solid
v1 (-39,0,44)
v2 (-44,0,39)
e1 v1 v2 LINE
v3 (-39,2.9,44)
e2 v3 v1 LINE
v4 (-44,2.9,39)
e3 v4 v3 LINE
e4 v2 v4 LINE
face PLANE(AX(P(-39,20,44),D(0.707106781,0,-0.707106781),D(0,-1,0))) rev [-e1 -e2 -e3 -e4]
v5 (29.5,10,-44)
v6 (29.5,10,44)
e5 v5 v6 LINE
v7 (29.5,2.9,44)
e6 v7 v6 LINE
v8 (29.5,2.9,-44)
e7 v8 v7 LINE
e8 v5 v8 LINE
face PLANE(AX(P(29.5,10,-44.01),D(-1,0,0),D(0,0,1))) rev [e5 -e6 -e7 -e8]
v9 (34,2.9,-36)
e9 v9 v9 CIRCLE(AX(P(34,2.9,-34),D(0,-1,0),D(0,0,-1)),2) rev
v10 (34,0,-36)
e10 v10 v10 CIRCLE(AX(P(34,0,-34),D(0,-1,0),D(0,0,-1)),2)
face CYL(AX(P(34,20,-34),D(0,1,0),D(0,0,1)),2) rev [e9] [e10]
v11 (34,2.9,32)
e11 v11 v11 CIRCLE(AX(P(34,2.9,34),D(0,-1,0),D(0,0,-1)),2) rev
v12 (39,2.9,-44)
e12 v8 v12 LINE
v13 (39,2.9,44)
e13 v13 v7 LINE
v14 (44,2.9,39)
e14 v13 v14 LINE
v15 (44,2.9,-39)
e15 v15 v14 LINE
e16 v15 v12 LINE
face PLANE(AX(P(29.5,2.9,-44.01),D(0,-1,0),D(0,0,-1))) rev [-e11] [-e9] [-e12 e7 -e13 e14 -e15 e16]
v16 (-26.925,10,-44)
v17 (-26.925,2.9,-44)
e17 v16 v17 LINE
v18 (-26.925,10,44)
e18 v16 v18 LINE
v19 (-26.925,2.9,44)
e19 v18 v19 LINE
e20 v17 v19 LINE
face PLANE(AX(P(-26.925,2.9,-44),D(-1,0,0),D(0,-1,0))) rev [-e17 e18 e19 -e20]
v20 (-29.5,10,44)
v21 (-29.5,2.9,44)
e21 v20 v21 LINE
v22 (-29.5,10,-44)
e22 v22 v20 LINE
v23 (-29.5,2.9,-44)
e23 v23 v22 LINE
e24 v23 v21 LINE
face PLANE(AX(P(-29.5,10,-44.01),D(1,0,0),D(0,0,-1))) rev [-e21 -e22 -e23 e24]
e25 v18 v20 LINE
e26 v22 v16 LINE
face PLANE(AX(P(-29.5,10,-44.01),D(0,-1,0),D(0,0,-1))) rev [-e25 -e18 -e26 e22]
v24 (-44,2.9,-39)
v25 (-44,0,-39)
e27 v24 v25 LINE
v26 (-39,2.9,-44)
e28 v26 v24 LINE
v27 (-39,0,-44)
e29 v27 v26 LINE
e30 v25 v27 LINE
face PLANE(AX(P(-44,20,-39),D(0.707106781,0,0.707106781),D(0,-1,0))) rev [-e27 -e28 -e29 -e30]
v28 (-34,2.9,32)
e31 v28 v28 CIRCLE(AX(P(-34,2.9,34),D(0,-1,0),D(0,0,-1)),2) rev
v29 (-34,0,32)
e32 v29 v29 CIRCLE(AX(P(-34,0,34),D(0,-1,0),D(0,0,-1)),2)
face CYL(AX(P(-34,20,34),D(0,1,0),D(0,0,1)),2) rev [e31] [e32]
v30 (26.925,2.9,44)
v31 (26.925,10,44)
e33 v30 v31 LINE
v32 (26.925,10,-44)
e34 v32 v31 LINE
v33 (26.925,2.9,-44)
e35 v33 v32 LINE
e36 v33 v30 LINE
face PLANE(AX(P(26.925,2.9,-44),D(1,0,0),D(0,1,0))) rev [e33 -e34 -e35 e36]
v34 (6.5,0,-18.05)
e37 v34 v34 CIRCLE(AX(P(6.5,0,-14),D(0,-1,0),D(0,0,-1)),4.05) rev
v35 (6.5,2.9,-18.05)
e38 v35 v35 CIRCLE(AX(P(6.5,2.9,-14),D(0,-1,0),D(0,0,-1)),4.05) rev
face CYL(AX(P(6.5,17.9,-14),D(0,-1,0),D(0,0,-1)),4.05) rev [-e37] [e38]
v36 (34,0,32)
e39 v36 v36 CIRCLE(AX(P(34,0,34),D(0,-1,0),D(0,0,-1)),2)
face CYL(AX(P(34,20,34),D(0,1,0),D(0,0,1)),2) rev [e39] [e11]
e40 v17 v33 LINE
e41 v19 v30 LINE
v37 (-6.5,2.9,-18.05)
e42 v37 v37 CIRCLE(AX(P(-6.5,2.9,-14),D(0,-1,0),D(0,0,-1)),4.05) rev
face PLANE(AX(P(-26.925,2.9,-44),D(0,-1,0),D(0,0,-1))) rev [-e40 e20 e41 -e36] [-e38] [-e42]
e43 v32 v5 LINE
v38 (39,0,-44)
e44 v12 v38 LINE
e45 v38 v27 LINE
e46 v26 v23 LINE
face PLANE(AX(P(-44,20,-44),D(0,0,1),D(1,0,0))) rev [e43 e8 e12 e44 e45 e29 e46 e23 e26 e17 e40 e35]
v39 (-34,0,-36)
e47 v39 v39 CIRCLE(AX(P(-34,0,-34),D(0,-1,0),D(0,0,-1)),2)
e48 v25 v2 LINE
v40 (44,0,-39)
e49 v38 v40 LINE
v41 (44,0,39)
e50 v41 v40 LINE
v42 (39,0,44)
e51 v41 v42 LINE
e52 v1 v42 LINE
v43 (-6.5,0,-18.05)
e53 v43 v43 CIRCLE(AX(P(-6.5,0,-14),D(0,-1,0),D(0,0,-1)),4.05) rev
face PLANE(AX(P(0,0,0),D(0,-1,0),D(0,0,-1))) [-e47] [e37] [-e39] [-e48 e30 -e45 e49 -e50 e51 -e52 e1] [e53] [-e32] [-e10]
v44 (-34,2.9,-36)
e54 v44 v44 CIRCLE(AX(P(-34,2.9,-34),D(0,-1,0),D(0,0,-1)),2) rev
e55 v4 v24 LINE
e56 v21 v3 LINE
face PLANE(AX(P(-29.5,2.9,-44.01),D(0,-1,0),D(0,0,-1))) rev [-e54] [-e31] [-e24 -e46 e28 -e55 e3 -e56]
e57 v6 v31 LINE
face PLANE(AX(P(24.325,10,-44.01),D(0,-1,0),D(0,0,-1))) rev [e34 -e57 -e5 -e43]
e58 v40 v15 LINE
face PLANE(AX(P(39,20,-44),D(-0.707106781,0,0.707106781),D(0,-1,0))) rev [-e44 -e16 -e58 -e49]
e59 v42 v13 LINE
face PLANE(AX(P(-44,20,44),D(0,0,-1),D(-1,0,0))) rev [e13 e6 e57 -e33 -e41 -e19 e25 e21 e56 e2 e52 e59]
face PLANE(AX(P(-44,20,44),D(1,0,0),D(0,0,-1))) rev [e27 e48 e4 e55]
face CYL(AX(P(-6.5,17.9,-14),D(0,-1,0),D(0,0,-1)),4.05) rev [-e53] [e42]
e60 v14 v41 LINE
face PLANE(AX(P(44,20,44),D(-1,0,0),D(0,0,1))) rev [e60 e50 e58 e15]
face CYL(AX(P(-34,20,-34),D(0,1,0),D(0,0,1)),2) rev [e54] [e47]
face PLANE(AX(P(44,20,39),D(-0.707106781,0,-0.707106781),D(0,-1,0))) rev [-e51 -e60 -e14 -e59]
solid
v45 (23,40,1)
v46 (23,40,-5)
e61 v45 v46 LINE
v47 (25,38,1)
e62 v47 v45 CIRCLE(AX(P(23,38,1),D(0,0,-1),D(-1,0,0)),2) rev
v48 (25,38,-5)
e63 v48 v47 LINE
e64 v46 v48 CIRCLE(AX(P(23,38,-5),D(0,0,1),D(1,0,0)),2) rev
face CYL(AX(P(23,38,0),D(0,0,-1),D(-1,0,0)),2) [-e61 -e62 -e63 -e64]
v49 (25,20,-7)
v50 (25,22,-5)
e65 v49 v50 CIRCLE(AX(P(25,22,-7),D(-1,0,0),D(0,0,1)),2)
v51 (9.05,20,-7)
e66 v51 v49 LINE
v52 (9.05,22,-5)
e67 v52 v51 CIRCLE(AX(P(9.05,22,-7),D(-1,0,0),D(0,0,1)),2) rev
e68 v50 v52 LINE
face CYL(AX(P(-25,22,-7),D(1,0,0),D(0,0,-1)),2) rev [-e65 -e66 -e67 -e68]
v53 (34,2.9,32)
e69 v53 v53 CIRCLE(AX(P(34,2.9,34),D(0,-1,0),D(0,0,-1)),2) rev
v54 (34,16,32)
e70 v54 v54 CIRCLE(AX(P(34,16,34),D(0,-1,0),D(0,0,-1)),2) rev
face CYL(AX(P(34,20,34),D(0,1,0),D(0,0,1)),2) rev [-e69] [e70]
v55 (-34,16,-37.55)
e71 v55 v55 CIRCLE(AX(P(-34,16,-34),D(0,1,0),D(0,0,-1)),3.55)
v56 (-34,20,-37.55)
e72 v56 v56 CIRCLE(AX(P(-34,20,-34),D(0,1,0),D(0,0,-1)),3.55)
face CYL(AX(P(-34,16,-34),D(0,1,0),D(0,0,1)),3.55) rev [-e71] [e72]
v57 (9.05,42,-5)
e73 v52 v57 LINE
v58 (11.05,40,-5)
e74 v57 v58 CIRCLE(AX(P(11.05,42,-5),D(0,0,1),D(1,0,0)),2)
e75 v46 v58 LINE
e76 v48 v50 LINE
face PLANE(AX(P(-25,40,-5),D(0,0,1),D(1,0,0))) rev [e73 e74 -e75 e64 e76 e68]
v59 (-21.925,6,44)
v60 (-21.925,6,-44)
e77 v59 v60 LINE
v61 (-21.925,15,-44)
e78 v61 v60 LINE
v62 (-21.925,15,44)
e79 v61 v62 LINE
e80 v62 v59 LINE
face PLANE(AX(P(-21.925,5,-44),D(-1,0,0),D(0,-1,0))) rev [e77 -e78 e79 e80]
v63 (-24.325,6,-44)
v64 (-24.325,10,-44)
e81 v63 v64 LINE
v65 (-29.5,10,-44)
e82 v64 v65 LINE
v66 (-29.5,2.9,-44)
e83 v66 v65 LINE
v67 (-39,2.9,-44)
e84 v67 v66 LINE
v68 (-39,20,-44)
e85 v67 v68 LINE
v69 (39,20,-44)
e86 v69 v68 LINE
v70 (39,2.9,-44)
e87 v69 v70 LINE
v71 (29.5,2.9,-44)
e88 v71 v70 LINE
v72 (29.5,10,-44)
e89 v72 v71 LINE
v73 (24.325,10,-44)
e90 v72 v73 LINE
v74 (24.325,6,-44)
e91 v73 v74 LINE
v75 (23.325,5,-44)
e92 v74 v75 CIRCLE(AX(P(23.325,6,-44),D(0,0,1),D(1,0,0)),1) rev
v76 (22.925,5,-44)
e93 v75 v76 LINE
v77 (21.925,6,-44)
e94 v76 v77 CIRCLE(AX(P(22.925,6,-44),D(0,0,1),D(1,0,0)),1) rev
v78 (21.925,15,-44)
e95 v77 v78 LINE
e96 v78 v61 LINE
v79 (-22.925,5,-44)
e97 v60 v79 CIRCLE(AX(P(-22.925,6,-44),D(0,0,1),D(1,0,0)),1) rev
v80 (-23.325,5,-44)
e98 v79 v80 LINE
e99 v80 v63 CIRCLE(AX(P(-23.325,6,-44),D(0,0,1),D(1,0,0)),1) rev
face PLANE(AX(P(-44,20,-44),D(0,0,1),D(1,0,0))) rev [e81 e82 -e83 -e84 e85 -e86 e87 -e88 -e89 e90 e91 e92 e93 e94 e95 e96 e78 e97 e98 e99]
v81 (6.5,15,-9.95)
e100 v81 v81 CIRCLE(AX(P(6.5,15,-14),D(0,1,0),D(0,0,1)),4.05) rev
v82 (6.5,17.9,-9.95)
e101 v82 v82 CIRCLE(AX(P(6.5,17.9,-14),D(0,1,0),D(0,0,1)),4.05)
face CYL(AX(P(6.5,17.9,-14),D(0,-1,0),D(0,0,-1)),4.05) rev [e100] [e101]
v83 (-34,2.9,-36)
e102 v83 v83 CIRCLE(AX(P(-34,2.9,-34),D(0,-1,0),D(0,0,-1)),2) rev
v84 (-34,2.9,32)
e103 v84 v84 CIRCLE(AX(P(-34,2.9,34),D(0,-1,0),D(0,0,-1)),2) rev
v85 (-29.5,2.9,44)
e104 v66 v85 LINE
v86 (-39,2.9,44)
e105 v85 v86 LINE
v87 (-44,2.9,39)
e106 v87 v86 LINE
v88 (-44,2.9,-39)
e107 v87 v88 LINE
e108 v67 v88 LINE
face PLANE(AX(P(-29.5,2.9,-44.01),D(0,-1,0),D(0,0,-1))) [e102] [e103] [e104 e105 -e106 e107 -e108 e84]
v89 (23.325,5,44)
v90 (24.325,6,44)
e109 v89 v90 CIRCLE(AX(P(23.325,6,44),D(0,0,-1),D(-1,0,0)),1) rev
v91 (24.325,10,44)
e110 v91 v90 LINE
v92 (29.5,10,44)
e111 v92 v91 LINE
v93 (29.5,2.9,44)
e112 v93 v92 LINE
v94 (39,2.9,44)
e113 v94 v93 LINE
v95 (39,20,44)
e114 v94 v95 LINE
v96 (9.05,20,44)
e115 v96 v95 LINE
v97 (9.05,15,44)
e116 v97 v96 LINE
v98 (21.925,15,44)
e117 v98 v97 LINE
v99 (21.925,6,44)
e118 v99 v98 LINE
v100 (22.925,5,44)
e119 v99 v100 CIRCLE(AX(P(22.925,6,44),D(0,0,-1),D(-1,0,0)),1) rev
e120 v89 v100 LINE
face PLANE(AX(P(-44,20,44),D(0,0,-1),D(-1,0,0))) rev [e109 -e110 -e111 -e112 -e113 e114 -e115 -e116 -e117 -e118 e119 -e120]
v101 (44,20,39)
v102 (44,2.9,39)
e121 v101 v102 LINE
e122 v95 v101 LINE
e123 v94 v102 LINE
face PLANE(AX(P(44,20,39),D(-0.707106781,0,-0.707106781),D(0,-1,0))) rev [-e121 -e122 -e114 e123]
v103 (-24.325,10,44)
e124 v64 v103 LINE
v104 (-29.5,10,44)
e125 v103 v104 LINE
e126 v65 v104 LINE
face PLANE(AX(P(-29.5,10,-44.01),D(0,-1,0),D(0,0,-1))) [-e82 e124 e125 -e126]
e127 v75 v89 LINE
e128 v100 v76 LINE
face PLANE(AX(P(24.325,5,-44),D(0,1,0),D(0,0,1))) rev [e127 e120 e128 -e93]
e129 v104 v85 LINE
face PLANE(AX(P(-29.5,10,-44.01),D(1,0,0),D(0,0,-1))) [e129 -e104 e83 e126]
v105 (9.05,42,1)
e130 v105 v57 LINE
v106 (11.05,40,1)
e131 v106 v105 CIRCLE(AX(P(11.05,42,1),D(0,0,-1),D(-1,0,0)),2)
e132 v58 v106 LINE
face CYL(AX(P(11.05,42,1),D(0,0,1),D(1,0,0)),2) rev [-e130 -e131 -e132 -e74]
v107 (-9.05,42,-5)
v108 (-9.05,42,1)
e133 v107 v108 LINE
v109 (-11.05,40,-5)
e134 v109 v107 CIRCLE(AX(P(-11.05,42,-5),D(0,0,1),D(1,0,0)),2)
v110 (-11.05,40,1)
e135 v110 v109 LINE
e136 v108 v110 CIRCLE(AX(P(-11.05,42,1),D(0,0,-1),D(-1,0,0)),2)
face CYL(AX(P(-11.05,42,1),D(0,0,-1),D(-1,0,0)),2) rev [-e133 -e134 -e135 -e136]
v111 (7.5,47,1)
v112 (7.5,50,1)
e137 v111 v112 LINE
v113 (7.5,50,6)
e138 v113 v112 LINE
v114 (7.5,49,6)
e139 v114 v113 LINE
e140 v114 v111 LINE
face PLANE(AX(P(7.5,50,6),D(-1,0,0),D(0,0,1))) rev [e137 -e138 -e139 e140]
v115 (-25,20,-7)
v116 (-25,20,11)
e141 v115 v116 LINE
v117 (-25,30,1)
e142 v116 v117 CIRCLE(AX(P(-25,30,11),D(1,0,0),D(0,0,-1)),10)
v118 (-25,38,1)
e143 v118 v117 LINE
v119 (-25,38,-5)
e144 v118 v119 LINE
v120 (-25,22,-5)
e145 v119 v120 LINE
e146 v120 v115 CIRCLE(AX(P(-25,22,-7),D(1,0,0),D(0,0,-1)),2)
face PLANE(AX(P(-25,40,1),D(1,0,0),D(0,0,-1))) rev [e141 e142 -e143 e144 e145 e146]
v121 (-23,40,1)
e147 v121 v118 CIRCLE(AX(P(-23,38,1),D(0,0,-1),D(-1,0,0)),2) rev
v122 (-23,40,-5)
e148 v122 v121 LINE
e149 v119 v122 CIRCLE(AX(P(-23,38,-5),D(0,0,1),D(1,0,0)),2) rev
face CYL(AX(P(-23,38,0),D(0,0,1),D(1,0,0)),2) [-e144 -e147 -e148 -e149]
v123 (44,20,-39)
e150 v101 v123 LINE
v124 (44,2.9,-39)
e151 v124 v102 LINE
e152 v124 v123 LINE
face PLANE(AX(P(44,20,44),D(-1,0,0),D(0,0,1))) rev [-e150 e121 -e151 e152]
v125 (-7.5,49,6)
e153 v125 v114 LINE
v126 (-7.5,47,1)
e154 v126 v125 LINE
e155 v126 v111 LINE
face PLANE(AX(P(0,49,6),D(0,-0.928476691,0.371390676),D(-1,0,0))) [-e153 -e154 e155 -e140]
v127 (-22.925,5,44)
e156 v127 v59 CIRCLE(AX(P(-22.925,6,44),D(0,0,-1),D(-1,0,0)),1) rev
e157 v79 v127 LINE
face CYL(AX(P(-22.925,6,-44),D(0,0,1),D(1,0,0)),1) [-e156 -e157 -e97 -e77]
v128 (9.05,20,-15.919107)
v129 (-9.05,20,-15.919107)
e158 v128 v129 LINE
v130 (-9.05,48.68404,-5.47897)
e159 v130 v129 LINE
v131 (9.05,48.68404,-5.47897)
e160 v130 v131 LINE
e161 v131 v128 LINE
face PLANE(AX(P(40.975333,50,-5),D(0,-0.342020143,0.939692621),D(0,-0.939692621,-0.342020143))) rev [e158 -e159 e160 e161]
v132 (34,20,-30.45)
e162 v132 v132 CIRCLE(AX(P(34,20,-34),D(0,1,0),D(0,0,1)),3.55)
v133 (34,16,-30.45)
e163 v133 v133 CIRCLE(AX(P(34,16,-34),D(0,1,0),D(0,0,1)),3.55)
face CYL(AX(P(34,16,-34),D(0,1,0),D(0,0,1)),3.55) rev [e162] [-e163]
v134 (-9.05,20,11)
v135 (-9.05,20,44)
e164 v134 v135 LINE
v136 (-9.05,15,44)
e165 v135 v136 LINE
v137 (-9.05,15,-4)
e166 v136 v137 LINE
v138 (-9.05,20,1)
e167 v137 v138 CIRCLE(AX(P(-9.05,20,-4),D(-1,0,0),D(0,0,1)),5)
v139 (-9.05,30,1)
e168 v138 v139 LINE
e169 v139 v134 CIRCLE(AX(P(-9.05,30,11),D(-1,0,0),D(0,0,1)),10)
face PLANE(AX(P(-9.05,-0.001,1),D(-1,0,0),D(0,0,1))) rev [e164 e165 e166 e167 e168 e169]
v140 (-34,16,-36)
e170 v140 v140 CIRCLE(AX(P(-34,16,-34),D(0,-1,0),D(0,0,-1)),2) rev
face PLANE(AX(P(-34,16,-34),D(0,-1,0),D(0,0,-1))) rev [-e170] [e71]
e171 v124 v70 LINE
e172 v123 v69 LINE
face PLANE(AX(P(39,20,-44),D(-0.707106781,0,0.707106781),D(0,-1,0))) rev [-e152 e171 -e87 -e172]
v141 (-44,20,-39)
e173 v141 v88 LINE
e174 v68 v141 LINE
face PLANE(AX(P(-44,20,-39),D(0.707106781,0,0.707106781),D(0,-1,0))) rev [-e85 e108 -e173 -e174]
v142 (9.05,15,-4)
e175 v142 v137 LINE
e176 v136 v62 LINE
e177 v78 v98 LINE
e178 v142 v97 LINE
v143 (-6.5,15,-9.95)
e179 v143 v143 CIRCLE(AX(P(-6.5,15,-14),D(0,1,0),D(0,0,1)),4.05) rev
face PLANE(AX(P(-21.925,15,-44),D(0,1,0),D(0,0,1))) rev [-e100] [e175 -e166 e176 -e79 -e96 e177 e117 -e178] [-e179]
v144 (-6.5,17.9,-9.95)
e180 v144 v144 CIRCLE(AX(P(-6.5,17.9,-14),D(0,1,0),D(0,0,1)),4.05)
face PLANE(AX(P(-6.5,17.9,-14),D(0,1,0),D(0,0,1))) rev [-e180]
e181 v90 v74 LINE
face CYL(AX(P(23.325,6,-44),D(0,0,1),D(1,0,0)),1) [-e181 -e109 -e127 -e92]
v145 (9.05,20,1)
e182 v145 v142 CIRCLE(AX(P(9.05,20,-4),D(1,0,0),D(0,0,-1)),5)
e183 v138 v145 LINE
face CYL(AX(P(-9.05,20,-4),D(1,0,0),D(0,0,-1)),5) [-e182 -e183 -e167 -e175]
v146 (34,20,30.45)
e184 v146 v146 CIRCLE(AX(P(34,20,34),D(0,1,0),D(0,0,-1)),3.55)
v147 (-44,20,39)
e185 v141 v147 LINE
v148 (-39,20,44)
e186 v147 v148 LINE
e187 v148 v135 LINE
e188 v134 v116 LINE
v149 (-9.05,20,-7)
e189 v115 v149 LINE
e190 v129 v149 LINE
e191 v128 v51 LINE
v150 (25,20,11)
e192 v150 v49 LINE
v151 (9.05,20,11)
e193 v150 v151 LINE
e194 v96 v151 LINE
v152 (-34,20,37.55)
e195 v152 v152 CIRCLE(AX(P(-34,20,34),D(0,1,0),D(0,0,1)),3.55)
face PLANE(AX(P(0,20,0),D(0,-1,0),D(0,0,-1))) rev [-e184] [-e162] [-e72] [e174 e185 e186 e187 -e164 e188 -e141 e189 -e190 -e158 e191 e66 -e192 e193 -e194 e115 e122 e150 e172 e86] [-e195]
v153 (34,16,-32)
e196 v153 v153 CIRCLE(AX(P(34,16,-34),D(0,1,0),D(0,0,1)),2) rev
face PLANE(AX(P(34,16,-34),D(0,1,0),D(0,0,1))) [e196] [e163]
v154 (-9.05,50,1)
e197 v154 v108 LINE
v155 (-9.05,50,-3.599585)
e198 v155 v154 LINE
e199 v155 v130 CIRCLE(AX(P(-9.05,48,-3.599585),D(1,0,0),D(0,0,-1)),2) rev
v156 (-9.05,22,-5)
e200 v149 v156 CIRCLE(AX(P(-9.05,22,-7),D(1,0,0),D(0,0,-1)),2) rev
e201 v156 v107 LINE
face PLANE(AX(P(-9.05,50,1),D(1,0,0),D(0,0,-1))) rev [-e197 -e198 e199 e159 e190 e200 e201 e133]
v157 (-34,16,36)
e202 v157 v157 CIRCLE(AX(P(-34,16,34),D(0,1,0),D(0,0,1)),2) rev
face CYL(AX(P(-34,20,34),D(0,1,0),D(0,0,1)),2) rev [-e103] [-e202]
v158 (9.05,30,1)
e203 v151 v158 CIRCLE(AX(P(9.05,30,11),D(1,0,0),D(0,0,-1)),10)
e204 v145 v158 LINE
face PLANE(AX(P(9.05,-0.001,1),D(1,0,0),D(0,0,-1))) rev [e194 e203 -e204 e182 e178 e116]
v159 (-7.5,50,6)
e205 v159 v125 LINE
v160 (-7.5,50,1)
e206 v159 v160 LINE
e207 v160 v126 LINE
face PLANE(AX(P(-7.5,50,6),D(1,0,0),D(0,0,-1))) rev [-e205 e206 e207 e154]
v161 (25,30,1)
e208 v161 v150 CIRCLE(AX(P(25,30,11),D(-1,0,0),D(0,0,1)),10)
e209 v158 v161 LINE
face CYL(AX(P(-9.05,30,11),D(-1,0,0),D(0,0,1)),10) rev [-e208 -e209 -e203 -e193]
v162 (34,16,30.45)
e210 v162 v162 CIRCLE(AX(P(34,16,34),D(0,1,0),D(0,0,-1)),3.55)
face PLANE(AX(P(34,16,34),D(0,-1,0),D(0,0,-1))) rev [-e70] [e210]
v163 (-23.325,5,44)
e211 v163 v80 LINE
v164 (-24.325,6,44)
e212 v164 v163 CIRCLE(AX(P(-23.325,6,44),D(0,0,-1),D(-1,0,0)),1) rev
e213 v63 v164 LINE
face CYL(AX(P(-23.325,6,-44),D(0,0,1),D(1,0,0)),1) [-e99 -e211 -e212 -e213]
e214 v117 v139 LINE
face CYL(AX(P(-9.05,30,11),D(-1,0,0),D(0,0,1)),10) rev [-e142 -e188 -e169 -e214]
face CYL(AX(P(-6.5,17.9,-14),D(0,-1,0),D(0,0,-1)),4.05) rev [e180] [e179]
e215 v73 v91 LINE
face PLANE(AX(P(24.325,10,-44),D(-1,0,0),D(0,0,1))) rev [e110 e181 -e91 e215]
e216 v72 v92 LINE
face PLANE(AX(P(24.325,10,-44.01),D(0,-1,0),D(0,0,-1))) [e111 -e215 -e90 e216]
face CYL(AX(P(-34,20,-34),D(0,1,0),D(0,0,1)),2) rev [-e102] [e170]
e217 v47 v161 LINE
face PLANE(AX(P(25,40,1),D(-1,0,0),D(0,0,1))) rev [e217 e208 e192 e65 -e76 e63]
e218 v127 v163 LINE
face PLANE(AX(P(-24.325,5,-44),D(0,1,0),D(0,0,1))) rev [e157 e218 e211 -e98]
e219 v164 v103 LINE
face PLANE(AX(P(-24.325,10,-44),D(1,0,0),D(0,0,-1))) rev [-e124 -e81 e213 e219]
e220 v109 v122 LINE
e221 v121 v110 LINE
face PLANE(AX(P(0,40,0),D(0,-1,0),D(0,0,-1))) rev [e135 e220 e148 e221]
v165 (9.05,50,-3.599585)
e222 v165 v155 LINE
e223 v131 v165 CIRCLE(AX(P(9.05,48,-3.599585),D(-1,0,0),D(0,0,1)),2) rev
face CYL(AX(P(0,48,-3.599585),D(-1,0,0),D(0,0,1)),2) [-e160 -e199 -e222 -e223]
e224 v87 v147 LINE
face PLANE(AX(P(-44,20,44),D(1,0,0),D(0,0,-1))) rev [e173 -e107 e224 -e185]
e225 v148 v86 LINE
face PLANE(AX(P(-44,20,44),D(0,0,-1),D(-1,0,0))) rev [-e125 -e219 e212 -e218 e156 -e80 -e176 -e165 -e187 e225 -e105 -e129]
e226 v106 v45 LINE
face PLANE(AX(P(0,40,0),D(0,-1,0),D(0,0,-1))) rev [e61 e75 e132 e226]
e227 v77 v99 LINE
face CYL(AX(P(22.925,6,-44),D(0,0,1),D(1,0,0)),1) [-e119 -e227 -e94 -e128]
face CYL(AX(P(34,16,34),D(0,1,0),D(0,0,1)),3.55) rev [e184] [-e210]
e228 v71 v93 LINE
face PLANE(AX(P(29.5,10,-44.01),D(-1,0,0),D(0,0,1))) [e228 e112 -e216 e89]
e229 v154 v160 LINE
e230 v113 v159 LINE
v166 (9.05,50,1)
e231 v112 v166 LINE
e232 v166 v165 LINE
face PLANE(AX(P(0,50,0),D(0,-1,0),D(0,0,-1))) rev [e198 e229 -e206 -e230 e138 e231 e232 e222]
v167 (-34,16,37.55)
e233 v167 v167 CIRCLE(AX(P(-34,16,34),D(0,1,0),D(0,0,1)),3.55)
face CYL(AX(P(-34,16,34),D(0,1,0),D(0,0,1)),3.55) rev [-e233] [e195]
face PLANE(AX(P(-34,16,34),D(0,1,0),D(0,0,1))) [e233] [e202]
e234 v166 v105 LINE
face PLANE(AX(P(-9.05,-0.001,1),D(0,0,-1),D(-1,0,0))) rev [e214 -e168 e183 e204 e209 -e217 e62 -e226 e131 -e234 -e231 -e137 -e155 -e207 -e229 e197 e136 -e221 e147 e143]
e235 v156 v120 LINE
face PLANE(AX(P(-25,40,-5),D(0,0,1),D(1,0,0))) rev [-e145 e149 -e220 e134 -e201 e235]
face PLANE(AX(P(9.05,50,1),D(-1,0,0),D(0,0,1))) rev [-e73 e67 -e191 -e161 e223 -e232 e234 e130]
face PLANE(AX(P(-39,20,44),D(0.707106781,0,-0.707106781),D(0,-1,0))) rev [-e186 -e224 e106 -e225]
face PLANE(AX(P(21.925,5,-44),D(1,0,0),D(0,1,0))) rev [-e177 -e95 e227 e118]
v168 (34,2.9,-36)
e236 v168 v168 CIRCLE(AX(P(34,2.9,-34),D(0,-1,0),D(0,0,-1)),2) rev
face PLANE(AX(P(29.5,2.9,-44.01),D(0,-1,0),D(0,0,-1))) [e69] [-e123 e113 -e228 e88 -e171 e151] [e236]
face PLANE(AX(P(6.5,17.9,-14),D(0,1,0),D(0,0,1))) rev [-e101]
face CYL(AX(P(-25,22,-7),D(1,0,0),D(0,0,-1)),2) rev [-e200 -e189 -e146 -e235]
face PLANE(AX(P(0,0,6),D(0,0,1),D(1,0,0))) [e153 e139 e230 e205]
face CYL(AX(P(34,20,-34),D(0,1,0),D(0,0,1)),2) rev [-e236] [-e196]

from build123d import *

# Parameters (mm, degrees)
SCHIZZO2_W                      = 88
SCHIZZO2_H                      = 88
ESTRUSIONE_ESTRUSIONE1_DEPTH    = 20
CUT_EXTRUDE1_DEPTH              = 101.399203184
CUT_EXTRUDE2_REACH              = 67.361
SKETCH2_W                       = 18.1
SKETCH2_H                       = 74
CUT_EXTRUDE3_REACH              = 66.532
SKETCH3_R                       = 4.05
CUT_EXTRUDE3_DIRECTION_2_DEPTH  = 15
CUT_EXTRUDE4_DEPTH              = 15
CUT_EXTRUDE4_DEPTH_BACK         = 3
SKETCH9_R                       = 4.05
SKETCH4_W                       = 50
SKETCH4_H                       = 6
BOSS_EXTRUDE1_DEPTH             = 20
SKETCH5_W                       = 18.1
SKETCH5_H                       = 6
BOSS_EXTRUDE2_DEPTH             = 10
FILLET1_R                       = 10
F_4_0_4_DIAMETER_HOLE1_D        = 4
SKETCH12_R                      = 3.55
CUT_EXTRUDE5_DEPTH              = 4
SMUSSO1_SIZE                    = 5
RACCORDO2_R                     = 2
FILLET2_R                       = 1
BOSS_EXTRUDE3_REACH             = 81.825
BOSS_EXTRUDE3_DIRECTION_2_REACH = 81.825
FILLET3_R                       = 5
FILLET4_R                       = 2
SKETCH14_W                      = 15
SKETCH14_H                      = 3
BOSS_EXTRUDE4_DEPTH             = 5
CHAMFER1_SIZE2                  = 2
CHAMFER1_SIZE                   = 5
SPLIT1_SURFACE_1_BACK           = 135.119
SPLIT1_SURFACE_1_DEPTH          = 270.238
SPLIT1_SURFACE_2_BACK           = 135.119
SPLIT1_SURFACE_2_DEPTH          = 270.238


with BuildPart() as part:
    # Schizzo2 → Estrusione-Estrusione1 (new body)
    with BuildSketch(Plane(origin=(0, 0, 0), x_dir=(1, 0, 0), z_dir=(0, 1, 0))):
        Rectangle(SCHIZZO2_W, SCHIZZO2_H)
    extrude(amount=ESTRUSIONE_ESTRUSIONE1_DEPTH)

    # Sketch1 → Cut-Extrude1 (cut, through all)
    with BuildSketch(Plane.XY.offset(44)):
        Polygon((-26.925, 2.9), (26.925, 2.9), (26.925, 10), (24.325, 10), (24.325, 5), (21.925, 5), (21.925, 15), (-21.925, 15), (-21.925, 5), (-24.325, 5), (-24.325, 10), (-26.925, 10), align=None)
    extrude(amount=-CUT_EXTRUDE1_DEPTH, mode=Mode.SUBTRACT)

    # Sketch2 → Cut-Extrude2 (cut, up to next)
    with BuildSketch(Plane(origin=(0, 20, 0), x_dir=(1, 0, 0), z_dir=(0, 1, 0)), mode=Mode.PRIVATE) as cut_extrude2_sk1:
        with Locations((0, -38)):
            Rectangle(SKETCH2_W, SKETCH2_H)
    cut_extrude2_tool1 = extrude(cut_extrude2_sk1.sketch, amount=-CUT_EXTRUDE2_REACH, mode=Mode.PRIVATE) & part.part
    add(cut_extrude2_tool1.solids().sort_by_distance((0, 20, 38))[0], mode=Mode.SUBTRACT)

    # Sketch3 → Cut-Extrude3 (cut, up to next)
    with BuildSketch(Plane(origin=(0, 2.9, 0), x_dir=(1, 0, 0), z_dir=(0, 1, 0)), mode=Mode.PRIVATE) as cut_extrude3_sk1:
        with Locations(Location((-6.5, 14, 0), (0, 0, 270))):
            Circle(SKETCH3_R)
    cut_extrude3_tool1 = extrude(cut_extrude3_sk1.sketch, amount=-CUT_EXTRUDE3_REACH, mode=Mode.PRIVATE) & part.part
    add(cut_extrude3_tool1.solids().sort_by_distance((-6.5, 2.9, -14))[0], mode=Mode.SUBTRACT)

    # Sketch3 → Cut-Extrude3 direction 2 (cut)
    with BuildSketch(Plane(origin=(0, 2.9, 0), x_dir=(1, 0, 0), z_dir=(0, 1, 0))):
        with Locations(Location((-6.5, 14, 0), (0, 0, 270))):
            Circle(SKETCH3_R)
    extrude(amount=CUT_EXTRUDE3_DIRECTION_2_DEPTH, mode=Mode.SUBTRACT)

    # Sketch9 → Cut-Extrude4 (cut, two sides: drawn at the far end of the back side and taken through both)
    with BuildSketch(Plane(origin=(0, 2.9, 0), x_dir=(1, 0, 0), z_dir=(0, 1, 0)).offset(-CUT_EXTRUDE4_DEPTH_BACK)):
        with Locations(Location((6.5, 14, 0), (0, 0, 270))):
            Circle(SKETCH9_R)
    extrude(amount=CUT_EXTRUDE4_DEPTH + CUT_EXTRUDE4_DEPTH_BACK, mode=Mode.SUBTRACT)

    # Sketch4 → Boss-Extrude1 (add)
    with BuildSketch(Plane(origin=(0, 20, 0), x_dir=(1, 0, 0), z_dir=(0, 1, 0))):
        with Locations((0, 2)):
            Rectangle(SKETCH4_W, SKETCH4_H)
    extrude(amount=BOSS_EXTRUDE1_DEPTH)

    # Sketch5 → Boss-Extrude2 (add)
    with BuildSketch(Plane(origin=(0, 40, 0), x_dir=(1, 0, 0), z_dir=(0, 1, 0))):
        with Locations((0, 2)):
            Rectangle(SKETCH5_W, SKETCH5_H)
    extrude(amount=BOSS_EXTRUDE2_DEPTH)

    # Fillet1
    fillet1_edges = [part.edges().sort_by_distance(p)[0] for p in [
        (17.025, 20, 1),
        (-17.025, 20, 1),
    ]]
    fillet(fillet1_edges, radius=FILLET1_R)

    # Ø4.0 (4) Diameter Hole1 (through all)
    with Locations(Plane(origin=(0, 20, 0), x_dir=(-1, 0, 0), z_dir=(0, 1, 0))):
        with Locations((-34, -34), (-34, 34), (34, 34), (34, -34)):
            Hole(F_4_0_4_DIAMETER_HOLE1_D / 2)

    # Sketch12 → Cut-Extrude5 (cut)
    with BuildSketch(Plane(origin=(0, 20, 0), x_dir=(1, 0, 0), z_dir=(0, 1, 0))):
        with Locations(Location((34, 34, 0), (0, 0, 270))):
            Circle(SKETCH12_R)
        with Locations(Location((-34, 34, 0), (0, 0, 90))):
            Circle(SKETCH12_R)
        with Locations(Location((-34, -34, 0), (0, 0, 270))):
            Circle(SKETCH12_R)
        with Locations(Location((34, -34, 0), (0, 0, 90))):
            Circle(SKETCH12_R)
    extrude(amount=-CUT_EXTRUDE5_DEPTH, mode=Mode.SUBTRACT)

    # Smusso1
    smusso1_edges = [part.edges().sort_by_distance(p)[0] for p in [
        (44, 10, 44),
        (-44, 10, 44),
        (-44, 10, -44),
        (44, 10, -44),
    ]]
    chamfer(smusso1_edges, length=SMUSSO1_SIZE)

    # Raccordo2
    raccordo2_edges = [part.edges().sort_by_distance(p)[0] for p in [
        (-9.05, 40, -2),
        (9.05, 40, -2),
        (0, 20, -5),
        (-25, 40, -2),
        (25, 40, -2),
    ]]
    fillet(raccordo2_edges, radius=RACCORDO2_R)

    # Fillet2
    fillet2_edges = [part.edges().sort_by_distance(p)[0] for p in [
        (-24.325, 5, 0),
        (-21.925, 5, 0),
        (21.925, 5, 0),
        (24.325, 5, 0),
    ]]
    fillet(fillet2_edges, radius=FILLET2_R)

    # Boss-Extrude3: up to this face of the body (flat: up to its plane)
    boss_extrude3_end = Plane(part.part.faces().sort_by_distance((9.05, 46, -2))[0])
    # Sketch13 → Boss-Extrude3 (add, up to the picked face)
    with BuildSketch(Plane(origin=(0, 0, 0), x_dir=(0, 0, -1), z_dir=(1, 0, 0)), mode=Mode.PRIVATE) as boss_extrude3_sk1:
        Polygon((5, 50), (15.919107028, 20), (5, 20), align=None)
    boss_extrude3_tool1 = split(extrude(boss_extrude3_sk1.sketch, amount=BOSS_EXTRUDE3_REACH, mode=Mode.PRIVATE), bisect_by=boss_extrude3_end, keep=Keep.BOTH, mode=Mode.PRIVATE)
    add(boss_extrude3_tool1.solids().sort_by(Axis((0, 30, -8.639702), (1, 0, 0)))[0])

    # Boss-Extrude3 direction 2: up to this face of the body (flat: up to its plane)
    boss_extrude3_direction_2_end = Plane(part.part.faces().sort_by_distance((-9.05, 46, -2))[0])
    # Sketch13 → Boss-Extrude3 direction 2 (add, up to the picked face)
    with BuildSketch(Plane(origin=(0, 0, 0), x_dir=(0, 0, -1), z_dir=(1, 0, 0)), mode=Mode.PRIVATE) as boss_extrude3_direction_2_sk1:
        Polygon((5, 50), (15.919107028, 20), (5, 20), align=None)
    boss_extrude3_direction_2_tool1 = split(extrude(boss_extrude3_direction_2_sk1.sketch, amount=-BOSS_EXTRUDE3_DIRECTION_2_REACH, mode=Mode.PRIVATE), bisect_by=boss_extrude3_direction_2_end, keep=Keep.BOTH, mode=Mode.PRIVATE)
    add(boss_extrude3_direction_2_tool1.solids().sort_by(Axis((0, 30, -8.639702), (-1, 0, 0)))[0])

    # Fillet3
    fillet3_edges = [part.edges().sort_by_distance(p)[0] for p in [
        (0, 15, 1),
    ]]
    fillet(fillet3_edges, radius=FILLET3_R)

    # Fillet4
    fillet4_edges = [part.edges().sort_by_distance(p)[0] for p in [
        (0, 50, -5),
    ]]
    fillet(fillet4_edges, radius=FILLET4_R)

    # Sketch14 → Boss-Extrude4 (add)
    with BuildSketch(Plane.XY.offset(1)):
        with Locations((0, 48.5)):
            Rectangle(SKETCH14_W, SKETCH14_H)
    extrude(amount=BOSS_EXTRUDE4_DEPTH)

    # Chamfer1
    chamfer1_edges = [part.edges().sort_by_distance(p)[0] for p in [
        (0, 47, 6),
    ]]
    chamfer1_side = [part.faces().sort_by_distance(p)[0] for p in [
        (0, 47, 5.96),
    ]]
    chamfer(chamfer1_edges, length=CHAMFER1_SIZE - 0.0001, length2=CHAMFER1_SIZE2 - 0.0001, reference=chamfer1_side[0])  # a hair under: the kernel refuses the full size


with BuildPart() as body_2:
    # Split1: the piece behind the surface
    add(part.part)
    # Split1 surface: a surface, the sketch's curves swept straight by 270.238 mm
    with BuildLine(Plane.XY.offset(44).offset(-SPLIT1_SURFACE_1_BACK), mode=Mode.PRIVATE) as split1_surface_1_path:
        Line((-44, 2.9), (-29.5, 2.9))
        Line((-29.5, 2.9), (-29.5, 10))
        Line((-29.5, 10), (-24.325, 10))
        Line((-24.325, 10), (-24.325, 5))
        Line((-24.325, 5), (24.325, 5))
        Line((24.325, 5), (24.325, 10))
        Line((24.325, 10), (29.5, 10))
        Line((29.5, 10), (29.5, 2.9))
        Line((29.5, 2.9), (44, 2.9))
    split1_surface_1 = Shell.extrude(split1_surface_1_path.wire(), (0 * SPLIT1_SURFACE_1_DEPTH, 0 * SPLIT1_SURFACE_1_DEPTH, 1 * SPLIT1_SURFACE_1_DEPTH))
    split(bisect_by=split1_surface_1, keep=Keep.BOTTOM)


with BuildPart() as part_1:
    add(part.part)

    # Split1: split by a surface, the side it looks to stays
    # Split1 surface: a surface, the sketch's curves swept straight by 270.238 mm
    with BuildLine(Plane.XY.offset(44).offset(-SPLIT1_SURFACE_2_BACK), mode=Mode.PRIVATE) as split1_surface_2_path:
        Line((-44, 2.9), (-29.5, 2.9))
        Line((-29.5, 2.9), (-29.5, 10))
        Line((-29.5, 10), (-24.325, 10))
        Line((-24.325, 10), (-24.325, 5))
        Line((-24.325, 5), (24.325, 5))
        Line((24.325, 5), (24.325, 10))
        Line((24.325, 10), (29.5, 10))
        Line((29.5, 10), (29.5, 2.9))
        Line((29.5, 2.9), (44, 2.9))
    split1_surface_2 = Shell.extrude(split1_surface_2_path.wire(), (0 * SPLIT1_SURFACE_2_DEPTH, 0 * SPLIT1_SURFACE_2_DEPTH, 1 * SPLIT1_SURFACE_2_DEPTH))
    split(bisect_by=split1_surface_2, keep=Keep.TOP)


solid = Compound([body_2.part, part_1.part])
